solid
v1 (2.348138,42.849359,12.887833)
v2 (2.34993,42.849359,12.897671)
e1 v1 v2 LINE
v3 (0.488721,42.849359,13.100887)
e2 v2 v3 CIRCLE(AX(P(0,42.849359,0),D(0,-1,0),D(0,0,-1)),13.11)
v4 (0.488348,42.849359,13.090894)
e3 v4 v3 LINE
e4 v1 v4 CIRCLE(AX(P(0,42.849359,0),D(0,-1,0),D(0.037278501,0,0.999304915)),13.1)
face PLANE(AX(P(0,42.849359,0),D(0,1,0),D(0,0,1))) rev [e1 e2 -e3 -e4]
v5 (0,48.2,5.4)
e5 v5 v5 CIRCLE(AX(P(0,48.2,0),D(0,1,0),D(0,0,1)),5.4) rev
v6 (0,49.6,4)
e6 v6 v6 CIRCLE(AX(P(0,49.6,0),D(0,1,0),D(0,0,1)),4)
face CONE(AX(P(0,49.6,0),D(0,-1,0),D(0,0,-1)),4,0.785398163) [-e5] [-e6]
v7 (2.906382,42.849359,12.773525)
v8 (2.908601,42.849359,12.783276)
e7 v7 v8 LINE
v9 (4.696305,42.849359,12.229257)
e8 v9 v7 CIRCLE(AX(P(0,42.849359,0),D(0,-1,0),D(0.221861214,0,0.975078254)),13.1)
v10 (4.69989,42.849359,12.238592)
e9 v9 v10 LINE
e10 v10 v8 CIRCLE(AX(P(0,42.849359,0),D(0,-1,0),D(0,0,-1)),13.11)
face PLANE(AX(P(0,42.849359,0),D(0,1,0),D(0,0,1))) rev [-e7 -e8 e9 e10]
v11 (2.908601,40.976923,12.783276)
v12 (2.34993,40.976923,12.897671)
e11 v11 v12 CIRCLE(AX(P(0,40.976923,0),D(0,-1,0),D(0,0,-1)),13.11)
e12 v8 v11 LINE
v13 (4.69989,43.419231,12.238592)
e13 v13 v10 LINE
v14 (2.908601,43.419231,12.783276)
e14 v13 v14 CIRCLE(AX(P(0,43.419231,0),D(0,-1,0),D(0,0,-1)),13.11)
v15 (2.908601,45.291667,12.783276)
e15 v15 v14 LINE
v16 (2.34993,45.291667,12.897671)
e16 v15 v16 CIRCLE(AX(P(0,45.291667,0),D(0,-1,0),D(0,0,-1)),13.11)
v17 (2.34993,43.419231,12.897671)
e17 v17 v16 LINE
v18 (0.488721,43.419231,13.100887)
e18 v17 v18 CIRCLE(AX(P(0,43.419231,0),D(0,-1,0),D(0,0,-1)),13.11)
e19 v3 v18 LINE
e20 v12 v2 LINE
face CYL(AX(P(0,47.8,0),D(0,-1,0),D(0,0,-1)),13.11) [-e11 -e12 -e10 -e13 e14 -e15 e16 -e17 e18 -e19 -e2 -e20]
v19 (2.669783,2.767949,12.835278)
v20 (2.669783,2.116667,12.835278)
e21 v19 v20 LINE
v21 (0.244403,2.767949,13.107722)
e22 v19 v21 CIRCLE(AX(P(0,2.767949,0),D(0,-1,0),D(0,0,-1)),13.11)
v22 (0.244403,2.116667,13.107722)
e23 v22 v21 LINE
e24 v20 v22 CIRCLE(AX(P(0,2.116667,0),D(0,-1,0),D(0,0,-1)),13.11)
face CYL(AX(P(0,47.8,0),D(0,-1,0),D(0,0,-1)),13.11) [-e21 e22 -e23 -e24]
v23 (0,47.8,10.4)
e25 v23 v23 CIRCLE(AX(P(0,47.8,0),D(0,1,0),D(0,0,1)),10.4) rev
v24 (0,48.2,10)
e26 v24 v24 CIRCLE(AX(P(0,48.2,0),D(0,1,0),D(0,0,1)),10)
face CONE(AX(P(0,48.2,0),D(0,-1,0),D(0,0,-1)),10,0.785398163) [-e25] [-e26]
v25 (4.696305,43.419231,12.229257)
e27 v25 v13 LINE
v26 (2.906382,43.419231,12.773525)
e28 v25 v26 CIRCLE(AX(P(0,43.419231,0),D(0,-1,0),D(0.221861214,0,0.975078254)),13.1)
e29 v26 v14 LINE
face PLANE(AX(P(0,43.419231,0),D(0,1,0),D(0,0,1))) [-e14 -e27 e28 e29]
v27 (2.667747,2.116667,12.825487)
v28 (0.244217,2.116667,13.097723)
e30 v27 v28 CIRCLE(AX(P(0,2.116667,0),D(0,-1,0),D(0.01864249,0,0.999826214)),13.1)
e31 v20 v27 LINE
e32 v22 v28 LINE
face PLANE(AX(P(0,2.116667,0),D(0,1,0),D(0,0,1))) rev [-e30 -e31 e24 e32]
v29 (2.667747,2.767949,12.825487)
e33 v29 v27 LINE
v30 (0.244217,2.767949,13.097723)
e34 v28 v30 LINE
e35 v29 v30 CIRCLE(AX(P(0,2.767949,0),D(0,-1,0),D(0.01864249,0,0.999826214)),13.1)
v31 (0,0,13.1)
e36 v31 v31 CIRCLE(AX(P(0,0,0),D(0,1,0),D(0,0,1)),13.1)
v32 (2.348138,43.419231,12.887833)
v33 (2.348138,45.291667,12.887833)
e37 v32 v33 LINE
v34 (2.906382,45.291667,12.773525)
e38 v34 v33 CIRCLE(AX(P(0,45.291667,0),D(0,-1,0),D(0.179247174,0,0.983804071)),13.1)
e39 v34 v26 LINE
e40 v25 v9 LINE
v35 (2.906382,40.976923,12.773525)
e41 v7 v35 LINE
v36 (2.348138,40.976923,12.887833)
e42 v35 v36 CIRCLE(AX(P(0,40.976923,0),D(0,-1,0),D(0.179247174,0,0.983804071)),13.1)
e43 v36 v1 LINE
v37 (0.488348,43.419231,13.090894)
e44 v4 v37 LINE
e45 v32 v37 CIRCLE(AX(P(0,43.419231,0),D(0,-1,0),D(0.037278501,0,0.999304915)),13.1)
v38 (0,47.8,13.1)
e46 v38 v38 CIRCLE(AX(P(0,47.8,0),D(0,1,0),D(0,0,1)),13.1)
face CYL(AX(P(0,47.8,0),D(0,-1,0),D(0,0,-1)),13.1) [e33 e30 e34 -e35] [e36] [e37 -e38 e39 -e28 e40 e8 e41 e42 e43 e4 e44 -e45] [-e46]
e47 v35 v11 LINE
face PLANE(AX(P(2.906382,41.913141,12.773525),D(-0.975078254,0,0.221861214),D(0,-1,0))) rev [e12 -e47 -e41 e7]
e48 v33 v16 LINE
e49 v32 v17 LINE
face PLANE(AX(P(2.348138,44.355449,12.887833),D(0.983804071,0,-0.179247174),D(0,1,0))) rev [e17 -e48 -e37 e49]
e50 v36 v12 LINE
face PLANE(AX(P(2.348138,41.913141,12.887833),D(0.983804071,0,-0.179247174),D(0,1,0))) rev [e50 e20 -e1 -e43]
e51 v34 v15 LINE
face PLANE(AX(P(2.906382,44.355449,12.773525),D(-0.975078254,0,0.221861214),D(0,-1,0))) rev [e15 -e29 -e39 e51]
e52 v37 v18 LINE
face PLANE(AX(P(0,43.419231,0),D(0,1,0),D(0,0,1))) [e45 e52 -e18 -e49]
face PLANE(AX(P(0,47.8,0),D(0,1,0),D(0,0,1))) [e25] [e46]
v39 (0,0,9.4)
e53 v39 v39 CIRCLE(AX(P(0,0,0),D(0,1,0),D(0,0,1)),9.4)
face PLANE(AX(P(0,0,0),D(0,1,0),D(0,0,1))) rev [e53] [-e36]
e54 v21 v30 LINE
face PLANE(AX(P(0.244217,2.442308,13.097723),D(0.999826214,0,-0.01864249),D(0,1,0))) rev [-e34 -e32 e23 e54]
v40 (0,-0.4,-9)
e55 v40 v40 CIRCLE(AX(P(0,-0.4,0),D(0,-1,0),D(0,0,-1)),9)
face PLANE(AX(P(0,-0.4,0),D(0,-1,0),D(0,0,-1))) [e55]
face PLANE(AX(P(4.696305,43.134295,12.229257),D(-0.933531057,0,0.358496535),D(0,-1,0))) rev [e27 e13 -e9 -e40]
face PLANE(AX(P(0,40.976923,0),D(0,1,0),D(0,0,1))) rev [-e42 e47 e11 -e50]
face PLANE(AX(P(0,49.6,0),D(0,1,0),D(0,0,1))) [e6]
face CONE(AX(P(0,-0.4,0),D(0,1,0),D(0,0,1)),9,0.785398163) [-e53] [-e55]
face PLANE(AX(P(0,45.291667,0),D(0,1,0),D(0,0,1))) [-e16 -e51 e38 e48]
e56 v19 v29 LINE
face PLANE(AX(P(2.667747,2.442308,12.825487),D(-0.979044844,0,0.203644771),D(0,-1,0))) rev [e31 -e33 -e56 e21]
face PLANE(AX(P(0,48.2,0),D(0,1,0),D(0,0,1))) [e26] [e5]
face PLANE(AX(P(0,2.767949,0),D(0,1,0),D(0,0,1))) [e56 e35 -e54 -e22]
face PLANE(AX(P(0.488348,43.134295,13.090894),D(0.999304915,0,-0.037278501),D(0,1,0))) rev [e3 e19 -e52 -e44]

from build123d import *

# Parameters (mm, degrees)
SKETCH1_R           = 13.1
BOSS_EXTRUDE1_DEPTH = 47.8
SKETCH2_R           = 10
BOSS_EXTRUDE2_DEPTH = 0.4
SKETCH3_R           = 4
BOSS_EXTRUDE3_DEPTH = 1.4
CHAMFER2_SIZE       = 1.4
CHAMFER3_SIZE       = 0.4
SKETCH4_R           = 9
BOSS_EXTRUDE4_DEPTH = 0.4
CHAMFER4_SIZE       = 0.4
WRAP1_START         = 40.976923077
WRAP1_DEPTH         = 4.31474359
WRAP1_START_2       = 42.849358974
WRAP1_2_DEPTH       = 0.569871795
WRAP1_START_3       = 2.116666667
WRAP1_3_DEPTH       = 0.651282051


# Read off the part's stored shape, not the designer's step: Wrap1
with BuildPart() as part:
    # Sketch1 → Boss-Extrude1 (new body)
    with BuildSketch(Plane(origin=(0, 0, 0), x_dir=(1, 0, 0), z_dir=(0, 1, 0))):
        with Locations(Location((0, 0, 0), (0, 0, 90))):
            Circle(SKETCH1_R)
    extrude(amount=BOSS_EXTRUDE1_DEPTH)

    # Sketch2 → Boss-Extrude2 (add)
    with BuildSketch(Plane(origin=(0, 47.8, 0), x_dir=(1, 0, 0), z_dir=(0, 1, 0))):
        with Locations(Location((0, 0, 0), (0, 0, 270))):
            Circle(SKETCH2_R)
    extrude(amount=BOSS_EXTRUDE2_DEPTH)

    # Sketch3 → Boss-Extrude3 (add)
    with BuildSketch(Plane(origin=(0, 48.2, 0), x_dir=(1, 0, 0), z_dir=(0, 1, 0))):
        with Locations(Location((0, 0, 0), (0, 0, 270))):
            Circle(SKETCH3_R)
    extrude(amount=BOSS_EXTRUDE3_DEPTH)

    # Chamfer2
    chamfer2_edges = [part.edges().sort_by_distance(p)[0] for p in [
        (0, 48.2, -4),
    ]]
    chamfer(chamfer2_edges, length=CHAMFER2_SIZE - 0.0001)  # a hair under: the kernel refuses the full size

    # Chamfer3
    chamfer3_edges = [part.edges().sort_by_distance(p)[0] for p in [
        (0, 47.8, -10),
    ]]
    chamfer(chamfer3_edges, length=CHAMFER3_SIZE - 0.0001)  # a hair under: the kernel refuses the full size

    # Sketch4 → Boss-Extrude4 (add)
    with BuildSketch(Plane.XZ):
        with Locations(Location((0, 0, 0), (0, 0, 90))):
            Circle(SKETCH4_R)
    extrude(amount=BOSS_EXTRUDE4_DEPTH)

    # Chamfer4
    chamfer4_edges = [part.edges().sort_by_distance(p)[0] for p in [
        (0, 0, -9),
    ]]
    chamfer(chamfer4_edges, length=CHAMFER4_SIZE - 0.0001)  # a hair under: the kernel refuses the full size

    # Wrap1 outline → Wrap1 (add)
    with BuildSketch(Plane(origin=(0, 0, 0), x_dir=(1, 0, 0), z_dir=(0, 1, 0)).offset(WRAP1_START)):
        with BuildLine():
            Line((2.348137979, -12.887833333), (2.34993045, -12.897671375))
            ThreePointArc((2.34993045, -12.897671375), (2.62988756, -12.843511647), (2.908600522, -12.783275911))
            Line((2.908600522, -12.783275911), (2.906381909, -12.773525128))
            ThreePointArc((2.906381909, -12.773525128), (2.627881543, -12.833714918), (2.348137979, -12.887833333))
        make_face()
    extrude(amount=WRAP1_DEPTH)

    # Wrap1 2 outline → Wrap1 2 (add)
    with BuildSketch(Plane(origin=(0, 0, 0), x_dir=(1, 0, 0), z_dir=(0, 1, 0)).offset(WRAP1_START_2)):
        with BuildLine():
            ThreePointArc((0.488721144, -13.100887437), (1.422958155, -13.032547337), (2.34993045, -12.897671375))
            Line((2.34993045, -12.897671375), (2.348137979, -12.887833333))
            ThreePointArc((2.348137979, -12.887833333), (1.421872756, -13.022606416), (0.488348359, -13.090894388))
            Line((0.488348359, -13.090894388), (0.488721144, -13.100887437))
        make_face()
        with BuildLine():
            Line((2.906381909, -12.773525128), (2.908600522, -12.783275911))
            ThreePointArc((2.908600522, -12.783275911), (3.813980922, -12.542952186), (4.699889571, -12.238592158))
            Line((4.699889571, -12.238592158), (4.696304606, -12.229256848))
            ThreePointArc((4.696304606, -12.229256848), (3.811071706, -12.533384716), (2.906381909, -12.773525128))
        make_face()
    extrude(amount=WRAP1_2_DEPTH)

    # Wrap1 3 outline → Wrap1 3 (add)
    with BuildSketch(Plane(origin=(0, 0, 0), x_dir=(1, 0, 0), z_dir=(0, 1, 0)).offset(WRAP1_START_3)):
        with BuildLine():
            ThreePointArc((0.488721144, -13.100887437), (1.584826216, -13.01385515), (2.669782951, -12.835277909))
            Line((2.669782951, -12.835277909), (2.667746504, -12.82548746))
            ThreePointArc((2.667746504, -12.82548746), (1.462330473, -13.018125425), (0.244216621, -13.097723399))
            Line((0.244216621, -13.097723399), (0.244403046, -13.107721661))
            ThreePointArc((0.244403046, -13.107721661), (0.366578022, -13.104873923), (0.488721144, -13.100887437))
        make_face()
    extrude(amount=WRAP1_3_DEPTH)


solid = part.part
